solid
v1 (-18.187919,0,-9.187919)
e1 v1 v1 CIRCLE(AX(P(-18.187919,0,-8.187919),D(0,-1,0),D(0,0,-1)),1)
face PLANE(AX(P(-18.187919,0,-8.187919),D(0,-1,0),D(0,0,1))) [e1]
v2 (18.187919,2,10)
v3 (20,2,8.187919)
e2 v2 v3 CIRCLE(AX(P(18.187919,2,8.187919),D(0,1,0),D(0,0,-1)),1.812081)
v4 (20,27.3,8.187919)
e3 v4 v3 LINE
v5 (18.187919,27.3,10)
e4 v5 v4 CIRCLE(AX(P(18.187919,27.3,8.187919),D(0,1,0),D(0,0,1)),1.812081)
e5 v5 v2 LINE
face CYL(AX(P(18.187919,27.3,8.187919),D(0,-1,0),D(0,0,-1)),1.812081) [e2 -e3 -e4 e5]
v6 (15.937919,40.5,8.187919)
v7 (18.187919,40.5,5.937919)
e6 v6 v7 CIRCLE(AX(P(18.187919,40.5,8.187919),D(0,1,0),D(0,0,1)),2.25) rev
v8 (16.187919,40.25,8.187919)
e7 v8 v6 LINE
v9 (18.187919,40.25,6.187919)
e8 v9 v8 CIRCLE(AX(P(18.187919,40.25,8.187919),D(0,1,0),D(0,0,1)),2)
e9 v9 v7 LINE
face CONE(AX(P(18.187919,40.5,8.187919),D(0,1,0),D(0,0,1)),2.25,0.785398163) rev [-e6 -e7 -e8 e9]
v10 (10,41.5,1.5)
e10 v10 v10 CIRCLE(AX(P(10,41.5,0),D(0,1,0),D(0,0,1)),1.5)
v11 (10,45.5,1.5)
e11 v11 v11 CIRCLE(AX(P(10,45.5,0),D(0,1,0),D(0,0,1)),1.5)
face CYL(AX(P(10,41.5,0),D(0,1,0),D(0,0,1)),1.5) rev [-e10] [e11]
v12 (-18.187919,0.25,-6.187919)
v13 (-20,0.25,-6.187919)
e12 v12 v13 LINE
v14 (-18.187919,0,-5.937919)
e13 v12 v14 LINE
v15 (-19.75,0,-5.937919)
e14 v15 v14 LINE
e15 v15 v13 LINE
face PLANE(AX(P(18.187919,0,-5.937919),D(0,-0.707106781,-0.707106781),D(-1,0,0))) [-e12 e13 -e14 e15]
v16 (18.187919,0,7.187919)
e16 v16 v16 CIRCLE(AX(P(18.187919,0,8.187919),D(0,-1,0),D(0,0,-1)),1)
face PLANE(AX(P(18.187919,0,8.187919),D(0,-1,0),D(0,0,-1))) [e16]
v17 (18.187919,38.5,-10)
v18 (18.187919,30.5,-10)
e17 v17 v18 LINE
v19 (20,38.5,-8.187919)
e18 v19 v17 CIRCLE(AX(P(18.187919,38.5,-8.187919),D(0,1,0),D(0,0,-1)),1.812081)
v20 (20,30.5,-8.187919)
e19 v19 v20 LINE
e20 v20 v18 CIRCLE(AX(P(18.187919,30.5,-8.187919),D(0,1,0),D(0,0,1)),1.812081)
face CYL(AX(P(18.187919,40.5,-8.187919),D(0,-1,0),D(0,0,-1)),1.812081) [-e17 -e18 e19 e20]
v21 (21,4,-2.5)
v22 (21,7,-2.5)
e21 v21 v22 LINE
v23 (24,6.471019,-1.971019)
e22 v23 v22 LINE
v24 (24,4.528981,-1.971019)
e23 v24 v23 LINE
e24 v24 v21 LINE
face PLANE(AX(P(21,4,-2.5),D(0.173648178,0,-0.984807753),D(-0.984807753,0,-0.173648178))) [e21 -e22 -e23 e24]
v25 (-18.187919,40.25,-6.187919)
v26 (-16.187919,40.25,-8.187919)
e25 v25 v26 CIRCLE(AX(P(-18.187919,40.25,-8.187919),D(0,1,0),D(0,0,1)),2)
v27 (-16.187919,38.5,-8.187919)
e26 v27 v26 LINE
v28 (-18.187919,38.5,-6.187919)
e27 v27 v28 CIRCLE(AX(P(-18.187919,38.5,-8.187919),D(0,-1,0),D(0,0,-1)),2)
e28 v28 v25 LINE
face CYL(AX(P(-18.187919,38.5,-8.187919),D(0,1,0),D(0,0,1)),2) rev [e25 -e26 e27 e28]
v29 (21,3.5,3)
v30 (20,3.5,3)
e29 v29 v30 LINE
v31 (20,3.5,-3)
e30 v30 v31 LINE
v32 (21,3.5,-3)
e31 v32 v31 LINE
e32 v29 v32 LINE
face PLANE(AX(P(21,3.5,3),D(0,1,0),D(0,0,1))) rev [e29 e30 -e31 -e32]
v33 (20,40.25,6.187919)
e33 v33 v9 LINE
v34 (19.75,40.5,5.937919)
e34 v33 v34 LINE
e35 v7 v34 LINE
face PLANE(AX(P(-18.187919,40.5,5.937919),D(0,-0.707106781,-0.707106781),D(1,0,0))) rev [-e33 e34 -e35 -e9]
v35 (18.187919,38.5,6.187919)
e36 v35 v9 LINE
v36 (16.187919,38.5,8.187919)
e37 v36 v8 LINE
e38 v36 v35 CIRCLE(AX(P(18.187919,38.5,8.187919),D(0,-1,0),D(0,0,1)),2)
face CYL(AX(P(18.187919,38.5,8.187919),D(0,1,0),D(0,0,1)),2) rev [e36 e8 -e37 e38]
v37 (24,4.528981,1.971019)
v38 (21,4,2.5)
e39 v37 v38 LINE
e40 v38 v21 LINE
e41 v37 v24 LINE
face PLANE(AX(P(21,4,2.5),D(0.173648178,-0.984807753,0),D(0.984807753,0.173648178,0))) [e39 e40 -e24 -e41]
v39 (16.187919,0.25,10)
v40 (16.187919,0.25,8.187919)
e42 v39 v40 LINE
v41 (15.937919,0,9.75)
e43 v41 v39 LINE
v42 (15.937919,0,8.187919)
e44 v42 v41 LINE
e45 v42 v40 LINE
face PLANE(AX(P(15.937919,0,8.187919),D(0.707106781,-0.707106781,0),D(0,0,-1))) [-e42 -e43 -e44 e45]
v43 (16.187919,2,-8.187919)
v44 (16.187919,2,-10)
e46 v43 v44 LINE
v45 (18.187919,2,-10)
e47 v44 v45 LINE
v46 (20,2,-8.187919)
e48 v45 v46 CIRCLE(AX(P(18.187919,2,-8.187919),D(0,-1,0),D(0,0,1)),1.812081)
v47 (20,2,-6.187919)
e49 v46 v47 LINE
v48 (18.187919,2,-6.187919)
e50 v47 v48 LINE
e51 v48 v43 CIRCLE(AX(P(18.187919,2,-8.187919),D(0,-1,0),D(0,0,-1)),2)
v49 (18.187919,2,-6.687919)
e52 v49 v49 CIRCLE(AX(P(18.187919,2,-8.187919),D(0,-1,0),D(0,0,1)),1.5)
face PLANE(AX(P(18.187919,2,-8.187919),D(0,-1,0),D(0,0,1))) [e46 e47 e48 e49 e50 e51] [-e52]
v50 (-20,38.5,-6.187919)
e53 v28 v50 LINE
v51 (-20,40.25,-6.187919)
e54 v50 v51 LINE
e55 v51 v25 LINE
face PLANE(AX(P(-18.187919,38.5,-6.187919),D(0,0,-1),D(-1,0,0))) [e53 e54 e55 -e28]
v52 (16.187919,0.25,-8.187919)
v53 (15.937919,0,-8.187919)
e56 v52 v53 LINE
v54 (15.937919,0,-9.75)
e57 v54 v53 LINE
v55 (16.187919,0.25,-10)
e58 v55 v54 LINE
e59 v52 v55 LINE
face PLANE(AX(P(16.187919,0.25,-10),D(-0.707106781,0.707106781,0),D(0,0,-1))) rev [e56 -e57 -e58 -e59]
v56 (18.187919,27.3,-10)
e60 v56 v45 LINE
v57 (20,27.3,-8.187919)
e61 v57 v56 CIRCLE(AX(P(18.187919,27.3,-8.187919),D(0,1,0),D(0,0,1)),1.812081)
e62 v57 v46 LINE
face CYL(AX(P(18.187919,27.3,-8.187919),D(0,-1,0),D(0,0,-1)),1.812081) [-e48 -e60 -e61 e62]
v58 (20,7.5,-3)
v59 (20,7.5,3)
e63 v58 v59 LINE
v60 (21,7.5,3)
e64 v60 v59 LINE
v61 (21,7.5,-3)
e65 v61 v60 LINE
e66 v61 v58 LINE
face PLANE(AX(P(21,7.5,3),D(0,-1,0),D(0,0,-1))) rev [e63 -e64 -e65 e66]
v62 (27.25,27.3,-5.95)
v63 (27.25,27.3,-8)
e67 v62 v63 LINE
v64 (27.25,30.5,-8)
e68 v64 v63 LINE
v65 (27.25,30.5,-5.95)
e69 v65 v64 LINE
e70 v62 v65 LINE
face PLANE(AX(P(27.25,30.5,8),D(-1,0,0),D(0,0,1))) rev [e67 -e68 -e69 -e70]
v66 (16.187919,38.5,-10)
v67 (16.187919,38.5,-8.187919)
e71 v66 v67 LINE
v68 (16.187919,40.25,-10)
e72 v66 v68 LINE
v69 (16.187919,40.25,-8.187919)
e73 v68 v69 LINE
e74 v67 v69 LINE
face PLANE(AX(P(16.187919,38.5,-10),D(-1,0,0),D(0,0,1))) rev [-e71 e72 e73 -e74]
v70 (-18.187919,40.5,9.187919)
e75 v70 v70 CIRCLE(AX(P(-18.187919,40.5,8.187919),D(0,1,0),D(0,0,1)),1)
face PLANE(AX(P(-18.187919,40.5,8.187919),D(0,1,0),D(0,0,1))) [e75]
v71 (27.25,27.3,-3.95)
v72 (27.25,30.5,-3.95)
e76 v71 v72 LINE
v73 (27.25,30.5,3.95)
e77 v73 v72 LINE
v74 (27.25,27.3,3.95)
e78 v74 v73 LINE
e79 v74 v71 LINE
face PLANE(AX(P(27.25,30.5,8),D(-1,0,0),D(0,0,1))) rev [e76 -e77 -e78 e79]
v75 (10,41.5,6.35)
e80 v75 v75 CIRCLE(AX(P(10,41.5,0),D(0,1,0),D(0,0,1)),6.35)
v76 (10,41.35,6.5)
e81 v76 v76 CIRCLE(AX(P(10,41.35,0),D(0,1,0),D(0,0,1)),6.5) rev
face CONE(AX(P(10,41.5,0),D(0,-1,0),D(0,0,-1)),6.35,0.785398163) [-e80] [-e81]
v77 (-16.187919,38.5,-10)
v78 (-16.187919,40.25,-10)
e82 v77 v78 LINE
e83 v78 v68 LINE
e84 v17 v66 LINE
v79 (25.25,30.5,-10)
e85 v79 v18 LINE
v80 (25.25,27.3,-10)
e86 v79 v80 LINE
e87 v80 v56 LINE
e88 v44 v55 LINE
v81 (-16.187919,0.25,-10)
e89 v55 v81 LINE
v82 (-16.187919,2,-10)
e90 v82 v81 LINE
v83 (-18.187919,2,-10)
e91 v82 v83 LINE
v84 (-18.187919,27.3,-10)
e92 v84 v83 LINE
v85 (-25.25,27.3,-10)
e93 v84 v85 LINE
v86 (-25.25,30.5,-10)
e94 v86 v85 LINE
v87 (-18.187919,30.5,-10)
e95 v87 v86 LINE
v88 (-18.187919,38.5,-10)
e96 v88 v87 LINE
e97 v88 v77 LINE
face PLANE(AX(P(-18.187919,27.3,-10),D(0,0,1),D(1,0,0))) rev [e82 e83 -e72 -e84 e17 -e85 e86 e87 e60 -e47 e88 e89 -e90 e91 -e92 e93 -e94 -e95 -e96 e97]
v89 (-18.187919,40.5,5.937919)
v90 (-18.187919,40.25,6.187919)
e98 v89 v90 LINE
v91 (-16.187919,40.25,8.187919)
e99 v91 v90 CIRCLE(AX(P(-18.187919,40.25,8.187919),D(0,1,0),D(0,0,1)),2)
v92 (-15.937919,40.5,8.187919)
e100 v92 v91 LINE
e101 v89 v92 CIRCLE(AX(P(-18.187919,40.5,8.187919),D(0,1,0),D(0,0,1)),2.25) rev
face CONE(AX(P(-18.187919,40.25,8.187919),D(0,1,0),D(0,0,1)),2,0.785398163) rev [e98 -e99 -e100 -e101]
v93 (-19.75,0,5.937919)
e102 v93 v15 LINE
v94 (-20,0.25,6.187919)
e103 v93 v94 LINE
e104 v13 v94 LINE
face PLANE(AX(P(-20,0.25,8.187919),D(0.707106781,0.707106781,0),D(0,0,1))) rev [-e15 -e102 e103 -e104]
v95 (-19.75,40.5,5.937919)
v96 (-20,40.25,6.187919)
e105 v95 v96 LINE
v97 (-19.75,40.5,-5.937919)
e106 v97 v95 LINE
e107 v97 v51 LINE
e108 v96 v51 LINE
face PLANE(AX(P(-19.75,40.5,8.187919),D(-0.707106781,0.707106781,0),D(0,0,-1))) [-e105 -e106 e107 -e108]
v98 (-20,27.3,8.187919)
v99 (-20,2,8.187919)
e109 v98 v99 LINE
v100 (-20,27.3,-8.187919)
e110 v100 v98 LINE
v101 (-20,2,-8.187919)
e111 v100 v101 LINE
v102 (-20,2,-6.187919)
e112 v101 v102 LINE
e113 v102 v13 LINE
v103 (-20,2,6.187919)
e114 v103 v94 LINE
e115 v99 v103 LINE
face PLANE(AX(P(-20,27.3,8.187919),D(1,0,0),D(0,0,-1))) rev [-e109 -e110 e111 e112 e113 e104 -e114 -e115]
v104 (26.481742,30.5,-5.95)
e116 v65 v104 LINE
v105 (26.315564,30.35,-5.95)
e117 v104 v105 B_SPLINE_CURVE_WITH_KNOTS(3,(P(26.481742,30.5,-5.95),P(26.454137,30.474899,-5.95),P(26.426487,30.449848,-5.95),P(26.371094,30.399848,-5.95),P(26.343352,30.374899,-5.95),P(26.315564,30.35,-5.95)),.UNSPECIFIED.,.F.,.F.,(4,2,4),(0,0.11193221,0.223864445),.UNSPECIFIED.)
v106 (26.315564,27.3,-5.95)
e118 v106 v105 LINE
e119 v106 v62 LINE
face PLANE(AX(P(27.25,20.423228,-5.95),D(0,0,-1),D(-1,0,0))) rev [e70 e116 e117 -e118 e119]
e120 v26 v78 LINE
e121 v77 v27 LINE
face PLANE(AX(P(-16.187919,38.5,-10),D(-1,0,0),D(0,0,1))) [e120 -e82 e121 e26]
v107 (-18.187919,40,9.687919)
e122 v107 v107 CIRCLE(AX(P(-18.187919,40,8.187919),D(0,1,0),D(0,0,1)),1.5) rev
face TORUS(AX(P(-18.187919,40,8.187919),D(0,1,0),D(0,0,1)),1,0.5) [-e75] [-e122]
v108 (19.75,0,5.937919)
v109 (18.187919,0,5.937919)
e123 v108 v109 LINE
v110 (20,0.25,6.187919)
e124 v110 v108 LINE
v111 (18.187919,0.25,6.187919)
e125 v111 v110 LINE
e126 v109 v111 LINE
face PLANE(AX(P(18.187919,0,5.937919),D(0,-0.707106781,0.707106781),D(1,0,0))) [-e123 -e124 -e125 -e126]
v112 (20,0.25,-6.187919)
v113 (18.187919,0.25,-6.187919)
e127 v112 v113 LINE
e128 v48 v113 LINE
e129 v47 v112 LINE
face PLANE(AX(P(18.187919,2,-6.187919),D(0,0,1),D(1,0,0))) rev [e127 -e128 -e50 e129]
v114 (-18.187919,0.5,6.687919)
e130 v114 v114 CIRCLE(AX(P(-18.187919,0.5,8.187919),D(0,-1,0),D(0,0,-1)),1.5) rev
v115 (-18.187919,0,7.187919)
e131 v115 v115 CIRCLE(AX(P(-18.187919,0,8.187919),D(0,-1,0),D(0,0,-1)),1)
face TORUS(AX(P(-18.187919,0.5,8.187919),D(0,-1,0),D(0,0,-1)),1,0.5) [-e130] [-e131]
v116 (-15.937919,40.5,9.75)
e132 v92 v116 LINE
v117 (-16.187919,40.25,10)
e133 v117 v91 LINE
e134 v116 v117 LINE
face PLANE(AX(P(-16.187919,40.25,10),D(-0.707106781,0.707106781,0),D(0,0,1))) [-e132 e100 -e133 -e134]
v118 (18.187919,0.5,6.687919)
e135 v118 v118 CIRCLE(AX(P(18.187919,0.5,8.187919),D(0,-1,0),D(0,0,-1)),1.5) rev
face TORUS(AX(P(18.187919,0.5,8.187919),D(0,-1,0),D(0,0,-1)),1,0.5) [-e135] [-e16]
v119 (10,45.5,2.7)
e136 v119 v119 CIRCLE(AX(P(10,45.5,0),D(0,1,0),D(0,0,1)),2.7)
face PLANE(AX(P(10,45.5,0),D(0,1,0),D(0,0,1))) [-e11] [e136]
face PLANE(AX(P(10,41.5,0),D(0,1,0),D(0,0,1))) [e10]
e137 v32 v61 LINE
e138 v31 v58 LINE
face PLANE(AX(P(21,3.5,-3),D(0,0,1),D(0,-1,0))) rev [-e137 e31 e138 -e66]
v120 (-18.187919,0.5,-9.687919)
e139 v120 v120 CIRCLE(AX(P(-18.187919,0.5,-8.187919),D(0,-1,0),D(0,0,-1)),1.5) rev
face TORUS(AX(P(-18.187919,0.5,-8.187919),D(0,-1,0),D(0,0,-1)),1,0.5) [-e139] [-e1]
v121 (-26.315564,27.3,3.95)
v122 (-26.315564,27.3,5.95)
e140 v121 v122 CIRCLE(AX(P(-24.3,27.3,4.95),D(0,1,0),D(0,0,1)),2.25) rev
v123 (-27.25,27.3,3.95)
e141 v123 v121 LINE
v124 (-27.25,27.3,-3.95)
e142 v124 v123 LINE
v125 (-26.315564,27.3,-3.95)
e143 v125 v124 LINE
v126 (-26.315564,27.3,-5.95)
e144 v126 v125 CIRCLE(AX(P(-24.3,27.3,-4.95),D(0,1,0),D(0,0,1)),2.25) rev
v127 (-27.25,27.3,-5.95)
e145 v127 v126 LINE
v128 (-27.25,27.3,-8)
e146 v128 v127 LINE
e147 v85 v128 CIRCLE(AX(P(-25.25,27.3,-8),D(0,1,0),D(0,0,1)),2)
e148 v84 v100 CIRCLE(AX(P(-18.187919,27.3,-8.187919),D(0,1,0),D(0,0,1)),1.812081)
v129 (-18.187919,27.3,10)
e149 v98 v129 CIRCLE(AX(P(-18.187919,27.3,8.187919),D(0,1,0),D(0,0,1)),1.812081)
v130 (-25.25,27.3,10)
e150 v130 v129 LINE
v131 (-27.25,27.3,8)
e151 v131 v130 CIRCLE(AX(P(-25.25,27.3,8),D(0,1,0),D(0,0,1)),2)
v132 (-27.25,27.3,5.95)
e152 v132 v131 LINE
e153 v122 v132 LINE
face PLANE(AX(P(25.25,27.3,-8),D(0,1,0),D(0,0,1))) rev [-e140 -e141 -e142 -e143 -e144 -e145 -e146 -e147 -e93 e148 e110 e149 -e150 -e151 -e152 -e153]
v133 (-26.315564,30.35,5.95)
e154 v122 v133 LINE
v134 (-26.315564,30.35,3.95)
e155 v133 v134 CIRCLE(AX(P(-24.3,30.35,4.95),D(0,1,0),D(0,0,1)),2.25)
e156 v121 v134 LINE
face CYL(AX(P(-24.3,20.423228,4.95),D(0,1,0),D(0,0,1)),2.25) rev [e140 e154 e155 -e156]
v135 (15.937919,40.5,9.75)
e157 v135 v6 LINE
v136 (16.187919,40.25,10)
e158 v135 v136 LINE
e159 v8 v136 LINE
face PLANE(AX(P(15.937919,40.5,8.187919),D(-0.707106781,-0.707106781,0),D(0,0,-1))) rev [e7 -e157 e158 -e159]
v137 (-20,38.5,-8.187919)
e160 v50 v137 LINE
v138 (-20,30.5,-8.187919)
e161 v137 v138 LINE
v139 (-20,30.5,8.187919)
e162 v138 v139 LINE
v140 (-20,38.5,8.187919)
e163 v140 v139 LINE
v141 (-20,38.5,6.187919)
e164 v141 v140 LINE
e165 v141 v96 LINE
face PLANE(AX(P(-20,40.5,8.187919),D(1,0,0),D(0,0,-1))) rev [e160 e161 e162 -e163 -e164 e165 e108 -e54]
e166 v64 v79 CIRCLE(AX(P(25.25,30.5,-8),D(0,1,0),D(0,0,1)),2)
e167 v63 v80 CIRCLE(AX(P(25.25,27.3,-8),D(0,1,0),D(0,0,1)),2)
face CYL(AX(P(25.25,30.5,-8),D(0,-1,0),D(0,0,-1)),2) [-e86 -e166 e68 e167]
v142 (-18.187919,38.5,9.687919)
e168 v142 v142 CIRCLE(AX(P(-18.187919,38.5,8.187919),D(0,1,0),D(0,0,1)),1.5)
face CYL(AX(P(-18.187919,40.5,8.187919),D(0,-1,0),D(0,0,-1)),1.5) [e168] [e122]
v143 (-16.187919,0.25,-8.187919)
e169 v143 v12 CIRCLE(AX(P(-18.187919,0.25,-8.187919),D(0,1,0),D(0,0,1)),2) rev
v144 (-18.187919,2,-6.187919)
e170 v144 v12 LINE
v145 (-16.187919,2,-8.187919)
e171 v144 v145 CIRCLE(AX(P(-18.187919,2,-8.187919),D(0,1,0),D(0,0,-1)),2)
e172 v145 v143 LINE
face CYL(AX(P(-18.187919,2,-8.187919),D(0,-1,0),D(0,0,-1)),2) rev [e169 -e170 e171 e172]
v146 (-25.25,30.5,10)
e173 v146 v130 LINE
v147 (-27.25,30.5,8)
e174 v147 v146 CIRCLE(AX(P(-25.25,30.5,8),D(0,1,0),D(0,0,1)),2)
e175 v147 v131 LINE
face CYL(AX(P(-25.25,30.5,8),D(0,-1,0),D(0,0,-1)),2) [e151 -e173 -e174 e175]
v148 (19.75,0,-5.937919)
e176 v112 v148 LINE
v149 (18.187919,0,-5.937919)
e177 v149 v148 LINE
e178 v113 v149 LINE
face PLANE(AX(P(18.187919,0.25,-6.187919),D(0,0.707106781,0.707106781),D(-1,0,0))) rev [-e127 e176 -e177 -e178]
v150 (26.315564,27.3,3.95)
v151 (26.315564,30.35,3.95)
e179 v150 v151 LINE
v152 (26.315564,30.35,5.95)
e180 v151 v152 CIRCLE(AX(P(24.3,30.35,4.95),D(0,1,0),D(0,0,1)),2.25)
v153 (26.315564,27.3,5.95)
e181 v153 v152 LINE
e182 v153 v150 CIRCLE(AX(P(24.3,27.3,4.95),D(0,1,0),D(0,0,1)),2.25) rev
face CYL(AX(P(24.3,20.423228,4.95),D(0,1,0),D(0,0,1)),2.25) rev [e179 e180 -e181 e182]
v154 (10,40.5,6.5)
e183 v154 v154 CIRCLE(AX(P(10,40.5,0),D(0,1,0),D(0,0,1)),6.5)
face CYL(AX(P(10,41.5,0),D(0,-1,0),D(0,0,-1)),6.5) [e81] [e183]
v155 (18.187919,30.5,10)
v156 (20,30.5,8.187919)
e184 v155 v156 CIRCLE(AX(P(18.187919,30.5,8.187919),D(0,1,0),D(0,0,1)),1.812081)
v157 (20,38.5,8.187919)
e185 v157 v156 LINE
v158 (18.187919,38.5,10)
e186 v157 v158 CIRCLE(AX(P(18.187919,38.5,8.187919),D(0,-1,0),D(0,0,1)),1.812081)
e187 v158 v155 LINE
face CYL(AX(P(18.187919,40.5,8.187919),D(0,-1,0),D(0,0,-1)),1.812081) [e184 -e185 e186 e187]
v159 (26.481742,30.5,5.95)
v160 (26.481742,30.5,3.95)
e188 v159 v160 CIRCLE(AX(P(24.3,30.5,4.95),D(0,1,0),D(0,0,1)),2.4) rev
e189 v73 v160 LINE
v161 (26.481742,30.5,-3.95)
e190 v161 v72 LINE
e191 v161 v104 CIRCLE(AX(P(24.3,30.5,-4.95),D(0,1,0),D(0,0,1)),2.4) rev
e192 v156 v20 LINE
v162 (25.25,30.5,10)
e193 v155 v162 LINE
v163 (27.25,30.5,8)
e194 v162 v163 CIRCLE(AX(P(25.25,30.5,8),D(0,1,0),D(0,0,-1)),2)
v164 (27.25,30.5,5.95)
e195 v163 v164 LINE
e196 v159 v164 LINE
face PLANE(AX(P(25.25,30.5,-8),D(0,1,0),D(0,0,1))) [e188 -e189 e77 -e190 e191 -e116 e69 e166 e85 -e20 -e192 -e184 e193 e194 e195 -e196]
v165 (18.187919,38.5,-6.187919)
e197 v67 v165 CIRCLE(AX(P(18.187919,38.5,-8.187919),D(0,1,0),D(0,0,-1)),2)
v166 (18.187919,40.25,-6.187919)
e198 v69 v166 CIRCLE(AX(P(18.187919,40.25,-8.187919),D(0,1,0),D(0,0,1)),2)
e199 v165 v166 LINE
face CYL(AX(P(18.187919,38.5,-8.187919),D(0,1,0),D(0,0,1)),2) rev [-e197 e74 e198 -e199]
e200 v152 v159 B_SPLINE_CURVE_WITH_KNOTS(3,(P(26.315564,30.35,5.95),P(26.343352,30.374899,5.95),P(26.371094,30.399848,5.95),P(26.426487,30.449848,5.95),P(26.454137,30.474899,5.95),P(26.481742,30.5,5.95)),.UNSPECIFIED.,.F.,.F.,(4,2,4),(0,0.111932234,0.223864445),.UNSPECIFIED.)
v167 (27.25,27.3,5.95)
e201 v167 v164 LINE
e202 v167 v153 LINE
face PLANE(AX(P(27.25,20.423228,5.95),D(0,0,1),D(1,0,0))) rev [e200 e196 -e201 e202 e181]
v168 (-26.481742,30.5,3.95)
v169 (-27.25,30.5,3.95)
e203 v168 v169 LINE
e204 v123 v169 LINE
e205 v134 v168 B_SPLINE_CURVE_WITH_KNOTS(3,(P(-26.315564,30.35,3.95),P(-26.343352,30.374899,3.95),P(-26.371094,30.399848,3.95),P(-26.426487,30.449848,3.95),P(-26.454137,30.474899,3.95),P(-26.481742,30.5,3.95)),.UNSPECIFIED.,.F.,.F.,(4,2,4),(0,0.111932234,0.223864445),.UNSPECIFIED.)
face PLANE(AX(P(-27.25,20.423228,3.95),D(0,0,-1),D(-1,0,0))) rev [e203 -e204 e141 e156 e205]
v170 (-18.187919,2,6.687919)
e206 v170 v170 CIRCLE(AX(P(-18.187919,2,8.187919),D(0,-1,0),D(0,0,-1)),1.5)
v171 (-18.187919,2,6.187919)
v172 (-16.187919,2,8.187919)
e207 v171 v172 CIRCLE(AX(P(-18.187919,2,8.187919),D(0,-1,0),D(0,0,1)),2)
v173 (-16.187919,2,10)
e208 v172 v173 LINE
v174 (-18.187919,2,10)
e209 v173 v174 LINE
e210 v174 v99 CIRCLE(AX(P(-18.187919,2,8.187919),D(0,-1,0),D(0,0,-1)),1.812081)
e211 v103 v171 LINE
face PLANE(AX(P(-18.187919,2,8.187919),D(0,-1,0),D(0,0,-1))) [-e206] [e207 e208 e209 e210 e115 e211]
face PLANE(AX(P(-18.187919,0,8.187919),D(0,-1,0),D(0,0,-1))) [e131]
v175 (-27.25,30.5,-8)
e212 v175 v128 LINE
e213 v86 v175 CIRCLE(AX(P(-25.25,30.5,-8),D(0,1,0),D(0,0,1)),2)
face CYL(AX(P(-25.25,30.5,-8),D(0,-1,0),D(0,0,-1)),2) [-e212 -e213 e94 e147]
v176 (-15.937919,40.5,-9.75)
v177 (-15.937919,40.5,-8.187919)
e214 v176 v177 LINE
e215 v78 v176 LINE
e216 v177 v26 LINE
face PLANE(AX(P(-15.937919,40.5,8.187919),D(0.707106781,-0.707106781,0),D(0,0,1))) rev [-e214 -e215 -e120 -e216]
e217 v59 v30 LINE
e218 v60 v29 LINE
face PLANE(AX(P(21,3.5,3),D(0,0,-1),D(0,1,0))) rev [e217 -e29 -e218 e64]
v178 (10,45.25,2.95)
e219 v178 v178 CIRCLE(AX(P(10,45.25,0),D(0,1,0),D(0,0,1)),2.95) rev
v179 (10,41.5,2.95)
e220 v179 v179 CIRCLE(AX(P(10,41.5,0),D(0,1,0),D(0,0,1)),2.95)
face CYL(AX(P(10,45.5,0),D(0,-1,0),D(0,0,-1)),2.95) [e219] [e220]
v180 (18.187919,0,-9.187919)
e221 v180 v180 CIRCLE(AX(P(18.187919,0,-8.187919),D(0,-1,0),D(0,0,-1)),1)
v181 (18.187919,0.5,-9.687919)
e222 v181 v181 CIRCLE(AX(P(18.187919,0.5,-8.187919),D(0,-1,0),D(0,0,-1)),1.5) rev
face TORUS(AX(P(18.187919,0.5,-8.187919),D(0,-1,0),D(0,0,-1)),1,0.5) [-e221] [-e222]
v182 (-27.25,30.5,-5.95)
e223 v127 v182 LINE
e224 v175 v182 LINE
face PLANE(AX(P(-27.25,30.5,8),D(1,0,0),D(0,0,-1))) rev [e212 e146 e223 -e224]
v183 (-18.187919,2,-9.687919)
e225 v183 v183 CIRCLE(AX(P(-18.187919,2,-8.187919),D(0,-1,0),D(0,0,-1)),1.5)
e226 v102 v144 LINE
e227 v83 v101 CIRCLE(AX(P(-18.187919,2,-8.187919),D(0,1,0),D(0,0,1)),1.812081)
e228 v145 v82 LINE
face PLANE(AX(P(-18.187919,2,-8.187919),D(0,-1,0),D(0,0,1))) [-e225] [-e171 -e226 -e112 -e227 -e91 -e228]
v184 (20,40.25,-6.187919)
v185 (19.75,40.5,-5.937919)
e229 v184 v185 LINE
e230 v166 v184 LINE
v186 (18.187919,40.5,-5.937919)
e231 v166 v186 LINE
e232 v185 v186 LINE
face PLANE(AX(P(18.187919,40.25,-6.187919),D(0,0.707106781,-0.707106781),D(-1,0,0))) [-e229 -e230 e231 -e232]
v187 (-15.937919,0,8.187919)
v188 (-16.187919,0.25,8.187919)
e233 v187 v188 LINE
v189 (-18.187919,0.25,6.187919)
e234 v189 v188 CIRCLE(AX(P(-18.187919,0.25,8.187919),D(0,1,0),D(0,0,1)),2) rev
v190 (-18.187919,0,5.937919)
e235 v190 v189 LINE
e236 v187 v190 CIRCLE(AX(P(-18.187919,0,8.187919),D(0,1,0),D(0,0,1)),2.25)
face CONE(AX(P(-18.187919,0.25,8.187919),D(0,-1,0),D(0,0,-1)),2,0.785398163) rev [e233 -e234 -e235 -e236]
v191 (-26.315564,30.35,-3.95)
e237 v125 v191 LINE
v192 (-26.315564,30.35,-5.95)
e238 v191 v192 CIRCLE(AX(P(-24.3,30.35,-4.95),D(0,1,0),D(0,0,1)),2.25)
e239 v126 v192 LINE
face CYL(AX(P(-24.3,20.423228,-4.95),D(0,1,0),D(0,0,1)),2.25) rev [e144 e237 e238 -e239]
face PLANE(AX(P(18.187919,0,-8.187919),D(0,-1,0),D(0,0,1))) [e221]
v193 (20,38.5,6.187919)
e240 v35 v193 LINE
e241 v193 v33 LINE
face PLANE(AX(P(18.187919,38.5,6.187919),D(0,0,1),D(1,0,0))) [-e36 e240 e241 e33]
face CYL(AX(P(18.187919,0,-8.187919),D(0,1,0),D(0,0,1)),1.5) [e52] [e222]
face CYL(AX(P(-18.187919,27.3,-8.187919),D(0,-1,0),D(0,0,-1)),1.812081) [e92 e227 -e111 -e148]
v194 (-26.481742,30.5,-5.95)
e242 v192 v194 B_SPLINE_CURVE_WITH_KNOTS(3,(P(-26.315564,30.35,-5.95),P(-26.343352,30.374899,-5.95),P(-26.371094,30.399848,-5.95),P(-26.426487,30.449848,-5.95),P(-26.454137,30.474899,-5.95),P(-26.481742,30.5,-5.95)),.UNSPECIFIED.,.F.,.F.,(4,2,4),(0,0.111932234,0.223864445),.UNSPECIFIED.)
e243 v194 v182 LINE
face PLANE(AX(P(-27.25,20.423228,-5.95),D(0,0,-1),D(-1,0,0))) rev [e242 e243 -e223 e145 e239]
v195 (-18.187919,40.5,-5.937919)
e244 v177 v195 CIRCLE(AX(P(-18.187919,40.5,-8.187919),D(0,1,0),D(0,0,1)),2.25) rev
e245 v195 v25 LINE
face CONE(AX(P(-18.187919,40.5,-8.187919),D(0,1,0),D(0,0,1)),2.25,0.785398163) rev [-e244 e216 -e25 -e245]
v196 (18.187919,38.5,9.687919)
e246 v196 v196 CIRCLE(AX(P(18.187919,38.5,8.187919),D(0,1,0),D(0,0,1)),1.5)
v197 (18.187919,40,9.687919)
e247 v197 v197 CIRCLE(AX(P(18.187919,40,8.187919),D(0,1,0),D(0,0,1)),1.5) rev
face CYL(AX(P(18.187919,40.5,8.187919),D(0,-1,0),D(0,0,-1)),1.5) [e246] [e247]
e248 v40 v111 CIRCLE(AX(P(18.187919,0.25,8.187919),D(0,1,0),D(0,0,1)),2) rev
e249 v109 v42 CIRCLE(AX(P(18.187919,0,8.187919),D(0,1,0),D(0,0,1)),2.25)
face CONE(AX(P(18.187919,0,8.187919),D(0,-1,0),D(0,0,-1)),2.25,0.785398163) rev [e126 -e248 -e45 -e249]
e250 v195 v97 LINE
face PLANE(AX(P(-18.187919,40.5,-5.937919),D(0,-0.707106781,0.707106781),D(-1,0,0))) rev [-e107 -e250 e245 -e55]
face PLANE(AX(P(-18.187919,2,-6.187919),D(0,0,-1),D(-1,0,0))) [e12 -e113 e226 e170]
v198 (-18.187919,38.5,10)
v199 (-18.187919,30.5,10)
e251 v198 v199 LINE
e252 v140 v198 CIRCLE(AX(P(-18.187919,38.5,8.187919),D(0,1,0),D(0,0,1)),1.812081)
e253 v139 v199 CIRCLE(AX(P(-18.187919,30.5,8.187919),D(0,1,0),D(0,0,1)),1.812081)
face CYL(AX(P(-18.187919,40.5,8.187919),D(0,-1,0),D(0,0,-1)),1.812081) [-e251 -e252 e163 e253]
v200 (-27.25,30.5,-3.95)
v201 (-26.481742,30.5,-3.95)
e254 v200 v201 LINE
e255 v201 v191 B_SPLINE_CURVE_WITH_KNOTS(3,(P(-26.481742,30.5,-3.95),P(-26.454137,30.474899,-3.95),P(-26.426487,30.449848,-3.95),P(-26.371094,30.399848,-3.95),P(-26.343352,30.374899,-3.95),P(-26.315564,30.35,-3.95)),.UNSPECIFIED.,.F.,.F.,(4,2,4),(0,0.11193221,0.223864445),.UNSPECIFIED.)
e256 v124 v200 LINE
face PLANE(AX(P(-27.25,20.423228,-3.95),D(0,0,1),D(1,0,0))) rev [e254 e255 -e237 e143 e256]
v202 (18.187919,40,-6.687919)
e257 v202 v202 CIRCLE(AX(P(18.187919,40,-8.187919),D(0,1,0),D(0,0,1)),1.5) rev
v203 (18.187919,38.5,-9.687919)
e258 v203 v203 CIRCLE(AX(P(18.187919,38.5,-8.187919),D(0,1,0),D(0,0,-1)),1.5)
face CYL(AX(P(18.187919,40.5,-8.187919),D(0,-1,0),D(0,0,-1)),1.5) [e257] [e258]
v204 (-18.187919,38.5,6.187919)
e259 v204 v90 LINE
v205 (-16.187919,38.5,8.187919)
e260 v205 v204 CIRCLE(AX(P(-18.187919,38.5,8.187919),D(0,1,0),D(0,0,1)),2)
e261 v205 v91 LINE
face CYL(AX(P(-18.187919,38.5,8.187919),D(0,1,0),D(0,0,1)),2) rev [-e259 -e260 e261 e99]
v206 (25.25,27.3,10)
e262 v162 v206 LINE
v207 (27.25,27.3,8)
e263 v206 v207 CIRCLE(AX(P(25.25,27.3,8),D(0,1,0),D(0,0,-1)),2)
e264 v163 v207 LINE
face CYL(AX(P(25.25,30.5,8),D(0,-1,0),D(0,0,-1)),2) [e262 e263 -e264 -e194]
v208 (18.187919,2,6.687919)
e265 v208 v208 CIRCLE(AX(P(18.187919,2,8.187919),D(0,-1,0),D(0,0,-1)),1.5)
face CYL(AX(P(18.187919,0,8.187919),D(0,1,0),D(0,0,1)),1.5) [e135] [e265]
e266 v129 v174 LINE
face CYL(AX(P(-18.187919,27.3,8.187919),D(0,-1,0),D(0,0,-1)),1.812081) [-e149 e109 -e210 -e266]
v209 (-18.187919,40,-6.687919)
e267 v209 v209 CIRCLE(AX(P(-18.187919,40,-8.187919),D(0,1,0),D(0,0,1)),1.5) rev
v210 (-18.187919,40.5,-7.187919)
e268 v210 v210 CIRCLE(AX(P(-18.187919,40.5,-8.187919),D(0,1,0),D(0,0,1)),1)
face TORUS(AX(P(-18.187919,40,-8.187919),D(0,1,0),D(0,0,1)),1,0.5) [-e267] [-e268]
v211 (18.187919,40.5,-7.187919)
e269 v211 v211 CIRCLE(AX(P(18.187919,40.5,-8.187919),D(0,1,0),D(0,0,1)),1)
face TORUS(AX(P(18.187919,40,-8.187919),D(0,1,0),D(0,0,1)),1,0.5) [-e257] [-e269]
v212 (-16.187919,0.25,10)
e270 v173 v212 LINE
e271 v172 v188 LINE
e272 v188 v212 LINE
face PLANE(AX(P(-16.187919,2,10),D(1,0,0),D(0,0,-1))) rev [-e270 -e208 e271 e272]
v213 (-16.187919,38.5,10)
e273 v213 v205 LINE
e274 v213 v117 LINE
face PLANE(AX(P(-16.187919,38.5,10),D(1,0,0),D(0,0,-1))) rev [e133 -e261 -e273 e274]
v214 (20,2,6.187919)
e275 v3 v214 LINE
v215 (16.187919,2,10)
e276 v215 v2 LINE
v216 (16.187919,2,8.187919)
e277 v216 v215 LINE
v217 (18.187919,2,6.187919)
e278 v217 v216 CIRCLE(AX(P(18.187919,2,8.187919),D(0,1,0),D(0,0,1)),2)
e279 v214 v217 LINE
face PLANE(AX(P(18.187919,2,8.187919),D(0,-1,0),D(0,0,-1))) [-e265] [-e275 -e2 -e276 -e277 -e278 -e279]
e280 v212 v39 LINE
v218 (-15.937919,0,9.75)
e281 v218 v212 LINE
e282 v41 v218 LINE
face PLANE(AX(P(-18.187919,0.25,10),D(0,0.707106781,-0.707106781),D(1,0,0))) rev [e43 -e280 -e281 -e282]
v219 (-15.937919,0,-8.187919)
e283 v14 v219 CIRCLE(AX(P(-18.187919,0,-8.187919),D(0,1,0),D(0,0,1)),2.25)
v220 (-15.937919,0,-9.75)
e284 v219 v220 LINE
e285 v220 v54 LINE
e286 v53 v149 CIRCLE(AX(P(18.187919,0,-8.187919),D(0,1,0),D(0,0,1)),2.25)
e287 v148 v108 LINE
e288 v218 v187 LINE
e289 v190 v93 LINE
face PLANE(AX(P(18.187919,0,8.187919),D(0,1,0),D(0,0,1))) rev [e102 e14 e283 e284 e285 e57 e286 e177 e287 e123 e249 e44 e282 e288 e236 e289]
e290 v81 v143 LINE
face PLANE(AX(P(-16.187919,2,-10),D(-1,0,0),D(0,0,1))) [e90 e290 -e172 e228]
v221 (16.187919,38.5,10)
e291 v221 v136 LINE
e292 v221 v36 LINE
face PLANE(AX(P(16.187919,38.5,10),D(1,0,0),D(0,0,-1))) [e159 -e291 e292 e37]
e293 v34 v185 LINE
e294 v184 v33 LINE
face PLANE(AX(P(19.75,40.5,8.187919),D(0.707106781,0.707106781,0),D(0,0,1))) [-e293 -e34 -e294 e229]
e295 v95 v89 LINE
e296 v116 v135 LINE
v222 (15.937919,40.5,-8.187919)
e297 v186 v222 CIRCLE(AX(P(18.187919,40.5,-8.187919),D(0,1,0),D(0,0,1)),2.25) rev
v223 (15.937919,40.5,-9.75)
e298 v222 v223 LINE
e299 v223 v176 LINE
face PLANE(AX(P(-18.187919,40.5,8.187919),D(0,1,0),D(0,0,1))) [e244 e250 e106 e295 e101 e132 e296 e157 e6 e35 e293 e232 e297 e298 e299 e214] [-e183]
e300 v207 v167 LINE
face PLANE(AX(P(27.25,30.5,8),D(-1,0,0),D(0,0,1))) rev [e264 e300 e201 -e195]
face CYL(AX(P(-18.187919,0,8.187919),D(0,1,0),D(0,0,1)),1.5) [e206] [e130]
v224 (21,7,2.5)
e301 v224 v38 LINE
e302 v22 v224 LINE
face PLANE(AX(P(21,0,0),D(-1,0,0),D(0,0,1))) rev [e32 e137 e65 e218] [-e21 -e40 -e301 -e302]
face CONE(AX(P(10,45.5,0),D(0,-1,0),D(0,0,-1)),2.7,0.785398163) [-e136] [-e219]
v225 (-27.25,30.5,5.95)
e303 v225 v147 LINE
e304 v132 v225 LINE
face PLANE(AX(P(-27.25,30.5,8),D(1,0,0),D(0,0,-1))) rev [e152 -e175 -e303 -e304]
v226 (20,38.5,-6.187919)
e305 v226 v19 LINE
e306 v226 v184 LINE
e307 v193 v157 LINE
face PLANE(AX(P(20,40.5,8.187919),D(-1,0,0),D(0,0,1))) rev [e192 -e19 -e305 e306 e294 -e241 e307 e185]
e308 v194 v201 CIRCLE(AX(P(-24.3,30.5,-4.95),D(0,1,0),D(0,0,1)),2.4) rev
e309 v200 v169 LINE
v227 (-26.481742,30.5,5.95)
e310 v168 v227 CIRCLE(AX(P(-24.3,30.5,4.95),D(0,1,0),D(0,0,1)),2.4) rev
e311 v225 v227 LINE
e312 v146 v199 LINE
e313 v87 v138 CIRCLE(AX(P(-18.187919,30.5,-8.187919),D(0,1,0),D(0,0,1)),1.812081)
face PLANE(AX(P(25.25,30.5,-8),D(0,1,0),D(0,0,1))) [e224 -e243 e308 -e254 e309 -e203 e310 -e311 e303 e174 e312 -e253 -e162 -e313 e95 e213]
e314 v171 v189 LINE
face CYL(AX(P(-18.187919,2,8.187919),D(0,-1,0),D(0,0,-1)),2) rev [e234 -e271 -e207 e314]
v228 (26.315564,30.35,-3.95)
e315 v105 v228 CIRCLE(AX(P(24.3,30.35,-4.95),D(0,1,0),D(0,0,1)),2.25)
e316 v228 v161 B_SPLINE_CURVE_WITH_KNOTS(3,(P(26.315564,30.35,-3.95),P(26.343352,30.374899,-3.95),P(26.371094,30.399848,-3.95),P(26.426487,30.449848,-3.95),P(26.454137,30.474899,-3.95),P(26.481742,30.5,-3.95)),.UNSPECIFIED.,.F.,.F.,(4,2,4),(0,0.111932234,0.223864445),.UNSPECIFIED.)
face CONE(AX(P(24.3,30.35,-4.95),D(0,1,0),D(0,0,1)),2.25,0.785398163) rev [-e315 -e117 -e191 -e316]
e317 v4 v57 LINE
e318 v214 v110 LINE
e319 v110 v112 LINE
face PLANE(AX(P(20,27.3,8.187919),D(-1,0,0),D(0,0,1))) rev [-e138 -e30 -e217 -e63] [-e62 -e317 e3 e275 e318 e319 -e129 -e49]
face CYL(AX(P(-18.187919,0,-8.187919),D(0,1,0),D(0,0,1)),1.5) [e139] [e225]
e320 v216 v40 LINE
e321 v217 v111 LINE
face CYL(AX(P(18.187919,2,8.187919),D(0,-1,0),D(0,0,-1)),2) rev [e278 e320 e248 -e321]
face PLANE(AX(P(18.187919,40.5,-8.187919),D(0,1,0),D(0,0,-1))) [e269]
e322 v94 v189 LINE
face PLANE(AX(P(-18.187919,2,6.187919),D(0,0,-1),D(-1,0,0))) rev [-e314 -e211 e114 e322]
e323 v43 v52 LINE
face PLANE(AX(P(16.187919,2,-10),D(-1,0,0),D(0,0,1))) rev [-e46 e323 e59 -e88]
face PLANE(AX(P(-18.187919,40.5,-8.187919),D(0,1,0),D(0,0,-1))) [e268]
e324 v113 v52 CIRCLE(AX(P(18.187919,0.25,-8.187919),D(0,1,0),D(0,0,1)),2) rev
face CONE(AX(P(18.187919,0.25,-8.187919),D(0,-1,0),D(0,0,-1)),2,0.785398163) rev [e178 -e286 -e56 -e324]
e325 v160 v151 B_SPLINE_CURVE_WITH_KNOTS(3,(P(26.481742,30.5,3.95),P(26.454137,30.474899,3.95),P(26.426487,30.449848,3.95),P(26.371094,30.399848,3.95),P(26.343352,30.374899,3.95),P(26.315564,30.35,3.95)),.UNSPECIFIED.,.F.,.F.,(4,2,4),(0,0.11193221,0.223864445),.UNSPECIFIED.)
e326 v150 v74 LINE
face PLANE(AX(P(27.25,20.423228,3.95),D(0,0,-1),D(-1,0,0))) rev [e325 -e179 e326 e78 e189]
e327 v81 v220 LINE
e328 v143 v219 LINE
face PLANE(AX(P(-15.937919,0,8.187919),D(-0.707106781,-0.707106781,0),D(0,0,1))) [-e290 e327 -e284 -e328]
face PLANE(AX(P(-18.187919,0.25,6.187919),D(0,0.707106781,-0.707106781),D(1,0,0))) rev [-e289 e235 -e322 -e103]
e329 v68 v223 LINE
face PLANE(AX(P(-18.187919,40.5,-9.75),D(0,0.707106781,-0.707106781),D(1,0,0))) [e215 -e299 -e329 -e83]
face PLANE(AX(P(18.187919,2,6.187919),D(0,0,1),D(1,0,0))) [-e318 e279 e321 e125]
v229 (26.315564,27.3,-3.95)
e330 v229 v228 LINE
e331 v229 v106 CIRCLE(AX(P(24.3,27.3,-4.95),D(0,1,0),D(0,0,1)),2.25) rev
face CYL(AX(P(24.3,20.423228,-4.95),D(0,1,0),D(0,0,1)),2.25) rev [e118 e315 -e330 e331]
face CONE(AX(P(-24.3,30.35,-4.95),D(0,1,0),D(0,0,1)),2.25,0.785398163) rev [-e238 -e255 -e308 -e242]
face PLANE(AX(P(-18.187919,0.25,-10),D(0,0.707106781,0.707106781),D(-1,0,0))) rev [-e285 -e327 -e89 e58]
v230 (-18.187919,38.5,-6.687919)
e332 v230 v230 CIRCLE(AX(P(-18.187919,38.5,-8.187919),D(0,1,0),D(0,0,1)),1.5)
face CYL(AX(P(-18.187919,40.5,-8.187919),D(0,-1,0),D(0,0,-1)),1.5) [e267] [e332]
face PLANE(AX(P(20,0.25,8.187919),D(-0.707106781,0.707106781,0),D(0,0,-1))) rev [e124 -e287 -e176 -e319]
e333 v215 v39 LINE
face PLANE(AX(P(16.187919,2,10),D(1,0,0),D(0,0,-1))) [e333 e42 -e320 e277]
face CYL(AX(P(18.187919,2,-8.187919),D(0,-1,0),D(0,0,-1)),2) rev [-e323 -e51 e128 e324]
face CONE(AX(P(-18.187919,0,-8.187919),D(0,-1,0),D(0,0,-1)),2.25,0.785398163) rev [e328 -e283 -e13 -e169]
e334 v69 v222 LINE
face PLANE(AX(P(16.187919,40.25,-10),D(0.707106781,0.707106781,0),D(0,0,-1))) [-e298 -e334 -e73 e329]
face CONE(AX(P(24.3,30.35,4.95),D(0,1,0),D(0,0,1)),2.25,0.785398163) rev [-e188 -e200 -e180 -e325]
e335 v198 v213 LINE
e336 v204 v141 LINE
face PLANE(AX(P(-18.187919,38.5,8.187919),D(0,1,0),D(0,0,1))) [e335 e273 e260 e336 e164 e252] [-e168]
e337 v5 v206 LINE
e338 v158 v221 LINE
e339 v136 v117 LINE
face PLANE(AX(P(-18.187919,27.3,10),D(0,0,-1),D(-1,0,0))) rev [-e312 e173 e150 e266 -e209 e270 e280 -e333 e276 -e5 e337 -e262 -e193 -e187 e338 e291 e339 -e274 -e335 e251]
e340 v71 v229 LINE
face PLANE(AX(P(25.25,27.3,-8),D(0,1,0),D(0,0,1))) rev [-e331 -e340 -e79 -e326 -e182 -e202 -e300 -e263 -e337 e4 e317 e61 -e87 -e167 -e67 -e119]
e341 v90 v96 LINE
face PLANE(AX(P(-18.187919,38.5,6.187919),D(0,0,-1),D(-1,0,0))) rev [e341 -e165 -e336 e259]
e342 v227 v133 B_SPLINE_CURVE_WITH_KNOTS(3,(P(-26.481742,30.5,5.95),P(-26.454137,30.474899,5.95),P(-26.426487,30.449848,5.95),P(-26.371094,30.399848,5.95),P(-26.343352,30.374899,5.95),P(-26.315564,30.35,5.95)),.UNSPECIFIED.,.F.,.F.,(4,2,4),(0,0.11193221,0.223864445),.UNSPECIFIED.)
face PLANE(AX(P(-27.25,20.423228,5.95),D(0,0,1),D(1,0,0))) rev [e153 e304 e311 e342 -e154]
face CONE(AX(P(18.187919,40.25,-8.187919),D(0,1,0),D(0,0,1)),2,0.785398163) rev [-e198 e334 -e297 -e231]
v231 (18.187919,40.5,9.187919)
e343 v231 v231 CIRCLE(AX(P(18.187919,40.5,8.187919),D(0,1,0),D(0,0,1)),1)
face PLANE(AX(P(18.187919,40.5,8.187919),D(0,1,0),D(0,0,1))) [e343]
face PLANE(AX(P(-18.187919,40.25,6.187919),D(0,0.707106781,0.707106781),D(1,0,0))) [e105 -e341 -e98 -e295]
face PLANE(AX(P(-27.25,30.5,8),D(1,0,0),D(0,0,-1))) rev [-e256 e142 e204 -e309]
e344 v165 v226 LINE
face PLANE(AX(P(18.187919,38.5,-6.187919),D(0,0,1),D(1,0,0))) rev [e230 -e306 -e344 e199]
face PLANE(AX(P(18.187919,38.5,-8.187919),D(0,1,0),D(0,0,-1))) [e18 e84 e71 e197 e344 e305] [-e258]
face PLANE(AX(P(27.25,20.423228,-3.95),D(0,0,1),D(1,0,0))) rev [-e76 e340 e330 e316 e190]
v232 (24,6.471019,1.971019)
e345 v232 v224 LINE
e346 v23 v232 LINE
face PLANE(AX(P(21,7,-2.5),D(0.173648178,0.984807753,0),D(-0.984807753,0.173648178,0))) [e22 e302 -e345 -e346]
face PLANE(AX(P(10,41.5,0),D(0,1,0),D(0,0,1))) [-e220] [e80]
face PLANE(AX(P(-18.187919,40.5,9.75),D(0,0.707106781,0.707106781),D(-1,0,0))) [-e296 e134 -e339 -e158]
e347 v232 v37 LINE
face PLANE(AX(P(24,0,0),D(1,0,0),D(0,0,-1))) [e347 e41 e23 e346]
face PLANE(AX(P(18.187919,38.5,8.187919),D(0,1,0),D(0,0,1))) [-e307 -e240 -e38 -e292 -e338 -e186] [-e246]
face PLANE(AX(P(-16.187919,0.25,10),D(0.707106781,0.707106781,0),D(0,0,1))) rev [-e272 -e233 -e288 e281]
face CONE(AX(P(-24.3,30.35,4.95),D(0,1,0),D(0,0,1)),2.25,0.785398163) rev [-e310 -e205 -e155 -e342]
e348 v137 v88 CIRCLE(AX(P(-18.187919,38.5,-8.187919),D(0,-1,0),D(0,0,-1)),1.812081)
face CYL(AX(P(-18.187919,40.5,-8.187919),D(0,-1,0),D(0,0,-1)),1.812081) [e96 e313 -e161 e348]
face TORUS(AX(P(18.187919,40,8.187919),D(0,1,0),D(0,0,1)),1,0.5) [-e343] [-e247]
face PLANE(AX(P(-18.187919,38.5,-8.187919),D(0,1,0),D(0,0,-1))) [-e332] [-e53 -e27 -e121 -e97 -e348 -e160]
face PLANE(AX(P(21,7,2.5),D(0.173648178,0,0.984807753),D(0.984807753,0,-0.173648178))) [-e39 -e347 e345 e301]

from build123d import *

# Parameters (mm, degrees)
SALIENTE_EXTRUIR1_DEPTH  = 27.3
CORTAR_EXTRUIR1_DEPTH    = 2
CROQUIS3_R               = 1.5
SALIENTE_EXTRUIR2_DEPTH  = 2
REDONDEO1_R              = 0.5
REDONDEO1_OF_SIMETR_A1_R = 0.5
CHAFL_N1_SIZE            = 0.25
CROQUIS4_W               = 6
CROQUIS4_H               = 4
SALIENTE_EXTRUIR3_DEPTH  = 1
CROQUIS5_W               = 5
CROQUIS5_H               = 3
SALIENTE_EXTRUIR4_DEPTH  = 3
SALIENTE_EXTRUIR4_TAPER  = 10
SALIENTE_EXTRUIR5_DEPTH  = 3.2
CORTAR_EXTRUIR2_DEPTH    = 3.2
CHAFL_N2_SIZE            = 0.15
SALIENTE_EXTRUIR6_DEPTH  = 10
CORTAR_EXTRUIR3_START    = -2
CORTAR_EXTRUIR3_DEPTH    = 2
SALIENTE_EXTRUIR7_START  = 2
CROQUIS10_R              = 1.5
SALIENTE_EXTRUIR7_DEPTH  = 2
REDONDEO2_R              = 0.5
REDONDEO2_OF_SIMETR_A3_R = 0.5
CHAFL_N3_SIZE            = 0.25
CROQUIS11_R              = 6.5
SALIENTE_EXTRUIR8_DEPTH  = 1
CHAFL_N4_SIZE            = 0.15
CROQUIS12_R              = 2.95
SALIENTE_EXTRUIR9_DEPTH  = 4
CHAFL_N5_SIZE            = 0.25
CROQUIS13_R              = 1.5
CORTAR_EXTRUIR4_DEPTH    = 4


# Read off the part's stored shape, not the designer's step: Simetría2, Simetría4
with BuildPart() as part:
    # Croquis1 → Saliente-Extruir1 (new body)
    with BuildSketch(Plane(origin=(0, 0, 0), x_dir=(1, 0, 0), z_dir=(0, 1, 0))):
        with BuildLine():
            Line((-18.187919463, -10), (18.187919463, -10))
            ThreePointArc((18.187919463, -10), (19.469253899, -9.469253899), (20, -8.187919463))
            Line((20, -8.187919463), (20, 8.187919463))
            ThreePointArc((20, 8.187919463), (19.469253899, 9.469253899), (18.187919463, 10))
            Line((18.187919463, 10), (-18.187919463, 10))
            ThreePointArc((-18.187919463, 10), (-19.469253899, 9.469253899), (-20, 8.187919463))
            Line((-20, 8.187919463), (-20, -8.187919463))
            ThreePointArc((-20, -8.187919463), (-19.469253899, -9.469253899), (-18.187919463, -10))
        make_face()
    extrude(amount=SALIENTE_EXTRUIR1_DEPTH)

    # Croquis2 → Cortar-Extruir1 (cut)
    with BuildSketch(Plane.XZ):
        with BuildLine():
            Line((-20, 8.187919463), (-20, 6.187919463))
            Line((-20, 6.187919463), (-18.187919463, 6.187919463))
            ThreePointArc((-18.187919463, 6.187919463), (-16.773705901, 6.773705901), (-16.187919463, 8.187919463))
            Line((-16.187919463, 8.187919463), (-16.187919463, 10))
            Line((-16.187919463, 10), (-18.187919463, 10))
            ThreePointArc((-18.187919463, 10), (-19.469253899, 9.469253899), (-20, 8.187919463))
        make_face()
    cortar_extruir1 = extrude(amount=-CORTAR_EXTRUIR1_DEPTH, mode=Mode.SUBTRACT)

    # Croquis3 → Saliente-Extruir2 (add)
    with BuildSketch(Plane.XZ.offset(-2)):
        with Locations(Location((-18.187919463, 8.187919463, 0), (0, 0, 270))):
            Circle(CROQUIS3_R)
    saliente_extruir2 = extrude(amount=SALIENTE_EXTRUIR2_DEPTH)

    # Redondeo1
    redondeo1_edges = [part.edges().sort_by_distance(p)[0] for p in [
        (-18.187919463, 0, 9.687919463),
    ]]
    fillet(redondeo1_edges, radius=REDONDEO1_R)

    # Simetría1: Cortar-Extruir1, Saliente-Extruir2 across plane
    add(cortar_extruir1.mirror(Plane(origin=(0, 0, 0), x_dir=(0, 0, 1), z_dir=(1, 0, 0))), mode=Mode.SUBTRACT)
    add(saliente_extruir2.mirror(Plane(origin=(0, 0, 0), x_dir=(0, 0, 1), z_dir=(1, 0, 0))))

    # Redondeo1 of Simetría1
    redondeo1_of_simetr_a1_edges = [part.edges().sort_by_distance(p)[0] for p in [
        (18.187919463, 0, 9.687919463),
    ]]
    fillet(redondeo1_of_simetr_a1_edges, radius=REDONDEO1_OF_SIMETR_A1_R)

    # Simetría2
    split(bisect_by=Plane.XY, keep=Keep.TOP)

    # Simetr_a2 2: part across plane


with BuildPart() as part_1:
    add(part.part)
    add(part.part.mirror(Plane.XY))

    # Chaflán1
    chafl_n1_edges = [part_1.edges().sort_by_distance(p)[0] for p in [
        (0, 0, -10),
        (19.093959732, 0, -6.187919463),
        (16.773705901, 0, -6.773705901),
        (16.187919463, 0, -9.093959732),
        (0, 0, 10),
        (-19.093959732, 0, 6.187919463),
        (-16.773705901, 0, 6.773705901),
        (-16.187919463, 0, 9.093959732),
        (20, 0, 0),
        (19.093959732, 0, 6.187919463),
        (16.773705901, 0, 6.773705901),
        (16.187919463, 0, 9.093959732),
        (-20, 0, 0),
        (-19.093959732, 0, -6.187919463),
        (-16.773705901, 0, -6.773705901),
        (-16.187919463, 0, -9.093959732),
    ]]
    chamfer(chafl_n1_edges, length=CHAFL_N1_SIZE)

    # Croquis4 → Saliente-Extruir3 (add)
    with BuildSketch(Plane(origin=(20, 0, 0), x_dir=(0, 0, -1), z_dir=(1, 0, 0))):
        with Locations((0, 5.5)):
            Rectangle(CROQUIS4_W, CROQUIS4_H)
    extrude(amount=SALIENTE_EXTRUIR3_DEPTH)

    # Croquis5 → Saliente-Extruir4 (add)
    with BuildSketch(Plane(origin=(21, 0, 0), x_dir=(0, 0, -1), z_dir=(1, 0, 0))):
        with Locations((0, 5.5)):
            Rectangle(CROQUIS5_W, CROQUIS5_H)
    extrude(amount=SALIENTE_EXTRUIR4_DEPTH, taper=SALIENTE_EXTRUIR4_TAPER)

    # Croquis6 → Saliente-Extruir5 (add)
    with BuildSketch(Plane(origin=(0, 27.3, 0), x_dir=(1, 0, 0), z_dir=(0, 1, 0))):
        with BuildLine():
            Line((-25.25, -10), (25.25, -10))
            ThreePointArc((25.25, -10), (26.664213562, -9.414213562), (27.25, -8))
            Line((27.25, -8), (27.25, 8))
            ThreePointArc((27.25, 8), (26.664213562, 9.414213562), (25.25, 10))
            Line((25.25, 10), (-25.25, 10))
            ThreePointArc((-25.25, 10), (-26.664213562, 9.414213562), (-27.25, 8))
            Line((-27.25, 8), (-27.25, -8))
            ThreePointArc((-27.25, -8), (-26.664213562, -9.414213562), (-25.25, -10))
        make_face()
    extrude(amount=SALIENTE_EXTRUIR5_DEPTH)

    # Croquis7 → Cortar-Extruir2 (cut)
    with BuildSketch(Plane(origin=(0, 30.5, 0), x_dir=(1, 0, 0), z_dir=(0, 1, 0))):
        with BuildLine():
            Line((-27.25, 5.95), (-27.25, 3.95))
            Line((-27.25, 3.95), (-26.315564437, 3.95))
            ThreePointArc((-26.315564437, 3.95), (-22.05, 4.95), (-26.315564437, 5.95))
            Line((-26.315564437, 5.95), (-27.25, 5.95))
        make_face()
        with BuildLine():
            Line((27.25, 5.95), (27.25, 3.95))
            Line((27.25, 3.95), (26.315564437, 3.95))
            ThreePointArc((26.315564437, 3.95), (22.05, 4.95), (26.315564437, 5.95))
            Line((26.315564437, 5.95), (27.25, 5.95))
        make_face()
        with BuildLine():
            Line((27.25, -5.95), (26.315564437, -5.95))
            ThreePointArc((26.315564437, -5.95), (22.05, -4.95), (26.315564437, -3.95))
            Line((26.315564437, -3.95), (27.25, -3.95))
            Line((27.25, -3.95), (27.25, -5.95))
        make_face()
        with BuildLine():
            Line((-27.25, -3.95), (-26.315564437, -3.95))
            ThreePointArc((-26.315564437, -3.95), (-22.05, -4.95), (-26.315564437, -5.95))
            Line((-26.315564437, -5.95), (-27.25, -5.95))
            Line((-27.25, -5.95), (-27.25, -3.95))
        make_face()
    extrude(amount=-CORTAR_EXTRUIR2_DEPTH, mode=Mode.SUBTRACT)

    # Chaflán2
    chafl_n2_edges = [part_1.edges().sort_by_distance(p)[0] for p in [
        (-22.05, 30.5, -4.95),
        (22.05, 30.5, 4.95),
        (-22.05, 30.5, 4.95),
        (22.05, 30.5, -4.95),
    ]]
    chamfer(chafl_n2_edges, length=CHAFL_N2_SIZE)

    # Croquis8 → Saliente-Extruir6 (add)
    with BuildSketch(Plane(origin=(0, 30.5, 0), x_dir=(1, 0, 0), z_dir=(0, 1, 0))):
        with BuildLine():
            Line((-18.187919463, -10), (18.187919463, -10))
            ThreePointArc((18.187919463, -10), (19.469253899, -9.469253899), (20, -8.187919463))
            Line((20, -8.187919463), (20, 8.187919463))
            ThreePointArc((20, 8.187919463), (19.469253899, 9.469253899), (18.187919463, 10))
            Line((18.187919463, 10), (-18.187919463, 10))
            ThreePointArc((-18.187919463, 10), (-19.469253899, 9.469253899), (-20, 8.187919463))
            Line((-20, 8.187919463), (-20, -8.187919463))
            ThreePointArc((-20, -8.187919463), (-19.469253899, -9.469253899), (-18.187919463, -10))
        make_face()
    extrude(amount=SALIENTE_EXTRUIR6_DEPTH)

    # Croquis9 → Cortar-Extruir3 (cut)
    with BuildSketch(Plane(origin=(0, 40.5, 0), x_dir=(1, 0, 0), z_dir=(0, 1, 0)).offset(CORTAR_EXTRUIR3_START)):
        with BuildLine():
            Line((-20, -8.187919463), (-20, -6.187919463))
            Line((-20, -6.187919463), (-18.187919463, -6.187919463))
            ThreePointArc((-18.187919463, -6.187919463), (-16.773705901, -6.773705901), (-16.187919463, -8.187919463))
            Line((-16.187919463, -8.187919463), (-16.187919463, -10))
            Line((-16.187919463, -10), (-18.187919463, -10))
            ThreePointArc((-18.187919463, -10), (-19.469253899, -9.469253899), (-20, -8.187919463))
        make_face()
    cortar_extruir3 = extrude(amount=CORTAR_EXTRUIR3_DEPTH, mode=Mode.SUBTRACT)

    # Croquis10 → Saliente-Extruir7 (add)
    with BuildSketch(Plane(origin=(0, 38.5, 0), x_dir=(1, 0, 0), z_dir=(0, 1, 0)).offset(SALIENTE_EXTRUIR7_START)):
        with Locations(Location((-18.187919463, -8.187919463, 0), (0, 0, 90))):
            Circle(CROQUIS10_R)
    saliente_extruir7 = extrude(amount=-SALIENTE_EXTRUIR7_DEPTH)

    # Redondeo2
    redondeo2_edges = [part_1.edges().sort_by_distance(p)[0] for p in [
        (-18.187919463, 40.5, 9.687919463),
    ]]
    fillet(redondeo2_edges, radius=REDONDEO2_R)

    # Simetría3: Cortar-Extruir3, Saliente-Extruir7 across plane
    add(cortar_extruir3.mirror(Plane(origin=(0, 0, 0), x_dir=(0, 0, 1), z_dir=(1, 0, 0))), mode=Mode.SUBTRACT)
    add(saliente_extruir7.mirror(Plane(origin=(0, 0, 0), x_dir=(0, 0, 1), z_dir=(1, 0, 0))))

    # Redondeo2 of Simetría3
    redondeo2_of_simetr_a3_edges = [part_1.edges().sort_by_distance(p)[0] for p in [
        (18.187919463, 40.5, 9.687919463),
    ]]
    fillet(redondeo2_of_simetr_a3_edges, radius=REDONDEO2_OF_SIMETR_A3_R)

    # Simetría4
    split(bisect_by=Plane.XY, keep=Keep.TOP)

    # Simetr_a4 2: part across plane


with BuildPart() as part_2:
    add(part_1.part)
    add(part_1.part.mirror(Plane.XY))

    # Chaflán3
    chafl_n3_edges = [part_2.edges().sort_by_distance(p)[0] for p in [
        (0, 40.5, 10),
        (-16.187919463, 40.5, 9.093959732),
        (-16.773705901, 40.5, 6.773705901),
        (-19.093959732, 40.5, 6.187919463),
        (20, 40.5, 0),
        (16.187919463, 40.5, 9.093959732),
        (16.773705901, 40.5, 6.773705901),
        (19.093959732, 40.5, 6.187919463),
        (0, 40.5, -10),
        (16.187919463, 40.5, -9.093959732),
        (16.773705901, 40.5, -6.773705901),
        (19.093959732, 40.5, -6.187919463),
        (-20, 40.5, 0),
        (-16.187919463, 40.5, -9.093959732),
        (-16.773705901, 40.5, -6.773705901),
        (-19.093959732, 40.5, -6.187919463),
    ]]
    chamfer(chafl_n3_edges, length=CHAFL_N3_SIZE)

    # Croquis11 → Saliente-Extruir8 (add)
    with BuildSketch(Plane(origin=(0, 40.5, 0), x_dir=(1, 0, 0), z_dir=(0, 1, 0))):
        with Locations(Location((10, 0, 0), (0, 0, 270))):
            Circle(CROQUIS11_R)
    extrude(amount=SALIENTE_EXTRUIR8_DEPTH)

    # Chaflán4
    chafl_n4_edges = [part_2.edges().sort_by_distance(p)[0] for p in [
        (10, 41.5, -6.5),
    ]]
    chamfer(chafl_n4_edges, length=CHAFL_N4_SIZE)

    # Croquis12 → Saliente-Extruir9 (add)
    with BuildSketch(Plane(origin=(0, 41.5, 0), x_dir=(1, 0, 0), z_dir=(0, 1, 0))):
        with Locations(Location((10, 0, 0), (0, 0, 270))):
            Circle(CROQUIS12_R)
    extrude(amount=SALIENTE_EXTRUIR9_DEPTH)

    # Chaflán5
    chafl_n5_edges = [part_2.edges().sort_by_distance(p)[0] for p in [
        (10, 45.5, -2.95),
    ]]
    chamfer(chafl_n5_edges, length=CHAFL_N5_SIZE)

    # Croquis13 → Cortar-Extruir4 (cut)
    with BuildSketch(Plane(origin=(0, 45.5, 0), x_dir=(1, 0, 0), z_dir=(0, 1, 0))):
        with Locations(Location((10, 0, 0), (0, 0, 270))):
            Circle(CROQUIS13_R)
    extrude(amount=-CORTAR_EXTRUIR4_DEPTH, mode=Mode.SUBTRACT)


solid = part_2.part
